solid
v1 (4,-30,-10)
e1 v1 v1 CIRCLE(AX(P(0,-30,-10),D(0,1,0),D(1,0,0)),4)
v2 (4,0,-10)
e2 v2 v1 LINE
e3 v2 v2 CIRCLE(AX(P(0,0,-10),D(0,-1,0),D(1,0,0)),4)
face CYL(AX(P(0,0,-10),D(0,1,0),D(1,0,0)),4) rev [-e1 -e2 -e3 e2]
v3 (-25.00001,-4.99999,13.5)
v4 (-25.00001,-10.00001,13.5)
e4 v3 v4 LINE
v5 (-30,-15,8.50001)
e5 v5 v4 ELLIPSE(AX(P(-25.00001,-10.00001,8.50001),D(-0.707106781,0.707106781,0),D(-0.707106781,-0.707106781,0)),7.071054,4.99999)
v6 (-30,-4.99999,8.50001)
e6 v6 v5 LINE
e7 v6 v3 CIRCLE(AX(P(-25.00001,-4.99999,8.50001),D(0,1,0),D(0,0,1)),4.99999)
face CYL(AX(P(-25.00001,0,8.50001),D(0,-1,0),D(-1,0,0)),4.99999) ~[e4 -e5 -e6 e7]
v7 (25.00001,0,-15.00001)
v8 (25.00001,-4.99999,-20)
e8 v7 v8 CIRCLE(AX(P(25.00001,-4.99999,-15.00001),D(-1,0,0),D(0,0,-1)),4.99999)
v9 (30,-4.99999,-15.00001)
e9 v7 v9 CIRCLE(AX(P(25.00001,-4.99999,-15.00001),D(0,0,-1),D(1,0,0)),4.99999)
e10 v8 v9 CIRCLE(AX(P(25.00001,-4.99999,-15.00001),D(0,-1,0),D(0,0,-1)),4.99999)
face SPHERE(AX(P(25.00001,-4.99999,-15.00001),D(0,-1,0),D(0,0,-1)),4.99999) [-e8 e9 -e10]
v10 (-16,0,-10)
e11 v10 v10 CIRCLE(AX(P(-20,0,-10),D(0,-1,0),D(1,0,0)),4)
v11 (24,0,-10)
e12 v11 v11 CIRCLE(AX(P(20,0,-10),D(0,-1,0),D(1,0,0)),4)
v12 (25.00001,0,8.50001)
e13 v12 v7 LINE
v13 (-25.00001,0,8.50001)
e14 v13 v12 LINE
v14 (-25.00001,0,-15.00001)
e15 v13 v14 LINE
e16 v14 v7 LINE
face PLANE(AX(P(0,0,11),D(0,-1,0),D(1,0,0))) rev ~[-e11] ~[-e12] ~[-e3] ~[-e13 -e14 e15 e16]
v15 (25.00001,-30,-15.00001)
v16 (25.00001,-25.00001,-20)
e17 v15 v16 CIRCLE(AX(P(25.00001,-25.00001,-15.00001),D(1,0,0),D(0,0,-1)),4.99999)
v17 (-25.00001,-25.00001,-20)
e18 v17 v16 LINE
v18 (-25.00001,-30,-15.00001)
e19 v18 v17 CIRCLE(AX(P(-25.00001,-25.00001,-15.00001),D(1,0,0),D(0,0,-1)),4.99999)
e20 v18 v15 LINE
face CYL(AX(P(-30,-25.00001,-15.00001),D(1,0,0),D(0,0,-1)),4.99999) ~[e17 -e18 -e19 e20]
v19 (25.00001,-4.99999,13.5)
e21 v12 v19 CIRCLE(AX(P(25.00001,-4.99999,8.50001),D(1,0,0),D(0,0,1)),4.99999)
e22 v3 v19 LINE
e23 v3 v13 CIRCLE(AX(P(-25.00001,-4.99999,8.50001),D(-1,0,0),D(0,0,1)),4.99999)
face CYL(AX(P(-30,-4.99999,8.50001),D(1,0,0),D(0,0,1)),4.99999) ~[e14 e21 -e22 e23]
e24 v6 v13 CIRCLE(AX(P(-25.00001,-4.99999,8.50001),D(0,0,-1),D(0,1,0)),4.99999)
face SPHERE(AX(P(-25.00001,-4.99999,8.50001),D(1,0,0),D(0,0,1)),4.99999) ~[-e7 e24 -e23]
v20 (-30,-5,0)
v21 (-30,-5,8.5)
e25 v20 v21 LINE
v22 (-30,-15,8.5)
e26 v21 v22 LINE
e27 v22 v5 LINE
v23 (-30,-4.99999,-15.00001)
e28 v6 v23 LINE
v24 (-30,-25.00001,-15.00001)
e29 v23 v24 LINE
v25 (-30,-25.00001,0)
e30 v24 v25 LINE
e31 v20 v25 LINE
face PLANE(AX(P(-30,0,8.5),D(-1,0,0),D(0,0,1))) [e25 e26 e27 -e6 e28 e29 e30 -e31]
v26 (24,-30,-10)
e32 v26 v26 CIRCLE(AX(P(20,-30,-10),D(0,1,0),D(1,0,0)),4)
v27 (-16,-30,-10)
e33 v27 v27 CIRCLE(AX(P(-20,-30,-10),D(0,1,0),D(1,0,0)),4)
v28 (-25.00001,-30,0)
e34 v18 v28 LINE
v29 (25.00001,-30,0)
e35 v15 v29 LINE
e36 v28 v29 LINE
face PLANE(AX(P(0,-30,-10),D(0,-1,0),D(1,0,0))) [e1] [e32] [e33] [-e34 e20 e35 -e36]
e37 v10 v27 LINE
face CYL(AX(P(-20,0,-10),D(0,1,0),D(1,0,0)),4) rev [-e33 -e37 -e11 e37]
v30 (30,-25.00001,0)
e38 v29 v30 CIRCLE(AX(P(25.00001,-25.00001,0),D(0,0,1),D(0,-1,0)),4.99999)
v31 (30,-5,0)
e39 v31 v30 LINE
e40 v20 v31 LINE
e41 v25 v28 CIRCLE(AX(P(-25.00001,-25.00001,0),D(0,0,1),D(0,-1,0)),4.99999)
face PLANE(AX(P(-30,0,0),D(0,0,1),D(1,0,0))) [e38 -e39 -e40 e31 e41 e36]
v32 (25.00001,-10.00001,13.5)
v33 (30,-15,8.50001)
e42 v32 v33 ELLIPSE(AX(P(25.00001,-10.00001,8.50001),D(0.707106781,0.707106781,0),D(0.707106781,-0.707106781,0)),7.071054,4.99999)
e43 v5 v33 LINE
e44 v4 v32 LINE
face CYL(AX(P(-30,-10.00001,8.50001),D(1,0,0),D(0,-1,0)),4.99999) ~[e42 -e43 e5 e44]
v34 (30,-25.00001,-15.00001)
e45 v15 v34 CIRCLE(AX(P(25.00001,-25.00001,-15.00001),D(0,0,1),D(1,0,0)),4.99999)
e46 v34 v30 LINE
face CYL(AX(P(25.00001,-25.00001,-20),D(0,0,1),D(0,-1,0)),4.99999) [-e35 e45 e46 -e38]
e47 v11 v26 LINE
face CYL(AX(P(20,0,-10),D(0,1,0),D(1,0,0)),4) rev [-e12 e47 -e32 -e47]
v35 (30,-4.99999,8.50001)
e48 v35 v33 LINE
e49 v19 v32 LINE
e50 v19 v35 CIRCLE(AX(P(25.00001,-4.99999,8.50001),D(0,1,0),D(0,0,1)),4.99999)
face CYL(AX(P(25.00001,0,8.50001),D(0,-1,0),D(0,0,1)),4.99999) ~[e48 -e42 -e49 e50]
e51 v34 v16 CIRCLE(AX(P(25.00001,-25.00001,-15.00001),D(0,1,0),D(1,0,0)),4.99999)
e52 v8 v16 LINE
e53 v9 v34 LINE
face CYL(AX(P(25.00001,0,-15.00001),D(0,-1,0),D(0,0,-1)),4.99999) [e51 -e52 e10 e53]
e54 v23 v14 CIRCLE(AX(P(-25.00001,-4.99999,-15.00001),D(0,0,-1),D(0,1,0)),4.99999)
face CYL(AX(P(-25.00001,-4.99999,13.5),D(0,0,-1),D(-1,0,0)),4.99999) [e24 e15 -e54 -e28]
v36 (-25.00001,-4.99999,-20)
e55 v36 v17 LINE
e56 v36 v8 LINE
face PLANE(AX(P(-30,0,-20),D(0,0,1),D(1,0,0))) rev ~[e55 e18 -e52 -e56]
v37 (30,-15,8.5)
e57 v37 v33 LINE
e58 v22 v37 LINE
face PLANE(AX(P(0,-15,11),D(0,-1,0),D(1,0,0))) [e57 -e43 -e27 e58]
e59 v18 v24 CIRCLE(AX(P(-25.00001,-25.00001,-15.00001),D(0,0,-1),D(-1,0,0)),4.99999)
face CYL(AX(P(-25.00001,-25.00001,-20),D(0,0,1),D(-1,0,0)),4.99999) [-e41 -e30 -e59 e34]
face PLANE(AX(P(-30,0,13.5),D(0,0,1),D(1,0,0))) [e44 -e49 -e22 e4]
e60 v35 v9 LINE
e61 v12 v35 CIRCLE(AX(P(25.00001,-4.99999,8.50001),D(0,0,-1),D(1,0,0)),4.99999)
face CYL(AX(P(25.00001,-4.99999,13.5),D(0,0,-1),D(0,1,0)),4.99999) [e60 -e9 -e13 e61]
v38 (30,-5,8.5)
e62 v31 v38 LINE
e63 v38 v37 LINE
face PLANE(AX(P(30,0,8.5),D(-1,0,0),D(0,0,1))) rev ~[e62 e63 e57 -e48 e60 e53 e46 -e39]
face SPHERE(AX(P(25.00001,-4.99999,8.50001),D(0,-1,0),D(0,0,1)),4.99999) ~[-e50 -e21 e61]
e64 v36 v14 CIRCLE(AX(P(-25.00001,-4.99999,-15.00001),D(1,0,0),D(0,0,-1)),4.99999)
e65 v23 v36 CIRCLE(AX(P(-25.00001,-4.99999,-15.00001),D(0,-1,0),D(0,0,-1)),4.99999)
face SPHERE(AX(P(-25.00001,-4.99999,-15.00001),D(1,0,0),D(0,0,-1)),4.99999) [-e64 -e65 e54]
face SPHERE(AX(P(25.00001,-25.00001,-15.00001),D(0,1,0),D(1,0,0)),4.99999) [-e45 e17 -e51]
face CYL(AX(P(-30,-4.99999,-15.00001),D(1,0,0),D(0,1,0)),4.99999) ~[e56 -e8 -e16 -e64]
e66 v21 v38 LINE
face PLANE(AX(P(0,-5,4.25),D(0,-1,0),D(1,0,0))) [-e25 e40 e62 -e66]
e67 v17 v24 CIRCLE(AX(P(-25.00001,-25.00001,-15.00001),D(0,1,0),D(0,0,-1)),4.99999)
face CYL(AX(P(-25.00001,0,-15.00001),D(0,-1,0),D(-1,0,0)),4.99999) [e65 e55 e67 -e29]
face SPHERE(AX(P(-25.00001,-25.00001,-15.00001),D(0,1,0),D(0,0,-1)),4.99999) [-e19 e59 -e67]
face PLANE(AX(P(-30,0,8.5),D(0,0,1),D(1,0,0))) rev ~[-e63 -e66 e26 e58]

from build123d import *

# Parameters (mm, degrees)
F0_W     = 60
F0_H     = 20
F1_DEPTH = 30
F2_W     = 60
F2_H     = 8.5
F3_DEPTH = 5
F4_W     = 60
F4_H     = 5
F5_DEPTH = 15
F6_R     = 4
F7_DEPTH = 30.001
F8_R     = 4.99999


# Not quite as in the source:
# - a fillet or chamfer is up to 0.001 mm smaller than in the source, because OpenCascade refuses the exact size


with BuildPart() as f1:
    # F0 (on Front) → F1 (new body)
    with BuildSketch(Plane.XZ):
        with Locations((0, -10)):
            Rectangle(F0_W, F0_H)
    extrude(amount=F1_DEPTH)

    # F2 (on Front) → F3 (join)
    with BuildSketch(Plane.XZ):
        with Locations((0, 4.25)):
            Rectangle(F2_W, F2_H)
    extrude(amount=F3_DEPTH)

    # F4 (on Front) → F5 (join)
    with BuildSketch(Plane.XZ):
        with Locations((0, 11)):
            Rectangle(F4_W, F4_H)
    extrude(amount=F5_DEPTH)

    # F6 (on Front) → F7 (cut, through all)
    with BuildSketch(Plane.XZ):
        with Locations((-20, -10)):
            Circle(F6_R)
        with Locations((0, -10)):
            Circle(F6_R)
        with Locations((20, -10)):
            Circle(F6_R)
    extrude(amount=F7_DEPTH, mode=Mode.SUBTRACT)

    # F8 (radius 5 in the source; OpenCascade refuses exactly that, so slightly less here)
    f8_edges = [f1.edges().sort_by_distance(p)[0] for p in [
        (30, -15, -20),
        (30, -30, -10),
        (30, -7.5, 13.5),
        (0, 0, 13.5),
        (0, 0, -20),
        (-30, -15, -20),
        (0, -30, -20),
        (-30, -30, -10),
        (-30, -7.5, 13.5),
        (-30, 0, -3.25),
        (0, -15, 13.5),
        (30, 0, -3.25),
    ]]
    fillet(f8_edges, radius=F8_R)


solid = f1.part
